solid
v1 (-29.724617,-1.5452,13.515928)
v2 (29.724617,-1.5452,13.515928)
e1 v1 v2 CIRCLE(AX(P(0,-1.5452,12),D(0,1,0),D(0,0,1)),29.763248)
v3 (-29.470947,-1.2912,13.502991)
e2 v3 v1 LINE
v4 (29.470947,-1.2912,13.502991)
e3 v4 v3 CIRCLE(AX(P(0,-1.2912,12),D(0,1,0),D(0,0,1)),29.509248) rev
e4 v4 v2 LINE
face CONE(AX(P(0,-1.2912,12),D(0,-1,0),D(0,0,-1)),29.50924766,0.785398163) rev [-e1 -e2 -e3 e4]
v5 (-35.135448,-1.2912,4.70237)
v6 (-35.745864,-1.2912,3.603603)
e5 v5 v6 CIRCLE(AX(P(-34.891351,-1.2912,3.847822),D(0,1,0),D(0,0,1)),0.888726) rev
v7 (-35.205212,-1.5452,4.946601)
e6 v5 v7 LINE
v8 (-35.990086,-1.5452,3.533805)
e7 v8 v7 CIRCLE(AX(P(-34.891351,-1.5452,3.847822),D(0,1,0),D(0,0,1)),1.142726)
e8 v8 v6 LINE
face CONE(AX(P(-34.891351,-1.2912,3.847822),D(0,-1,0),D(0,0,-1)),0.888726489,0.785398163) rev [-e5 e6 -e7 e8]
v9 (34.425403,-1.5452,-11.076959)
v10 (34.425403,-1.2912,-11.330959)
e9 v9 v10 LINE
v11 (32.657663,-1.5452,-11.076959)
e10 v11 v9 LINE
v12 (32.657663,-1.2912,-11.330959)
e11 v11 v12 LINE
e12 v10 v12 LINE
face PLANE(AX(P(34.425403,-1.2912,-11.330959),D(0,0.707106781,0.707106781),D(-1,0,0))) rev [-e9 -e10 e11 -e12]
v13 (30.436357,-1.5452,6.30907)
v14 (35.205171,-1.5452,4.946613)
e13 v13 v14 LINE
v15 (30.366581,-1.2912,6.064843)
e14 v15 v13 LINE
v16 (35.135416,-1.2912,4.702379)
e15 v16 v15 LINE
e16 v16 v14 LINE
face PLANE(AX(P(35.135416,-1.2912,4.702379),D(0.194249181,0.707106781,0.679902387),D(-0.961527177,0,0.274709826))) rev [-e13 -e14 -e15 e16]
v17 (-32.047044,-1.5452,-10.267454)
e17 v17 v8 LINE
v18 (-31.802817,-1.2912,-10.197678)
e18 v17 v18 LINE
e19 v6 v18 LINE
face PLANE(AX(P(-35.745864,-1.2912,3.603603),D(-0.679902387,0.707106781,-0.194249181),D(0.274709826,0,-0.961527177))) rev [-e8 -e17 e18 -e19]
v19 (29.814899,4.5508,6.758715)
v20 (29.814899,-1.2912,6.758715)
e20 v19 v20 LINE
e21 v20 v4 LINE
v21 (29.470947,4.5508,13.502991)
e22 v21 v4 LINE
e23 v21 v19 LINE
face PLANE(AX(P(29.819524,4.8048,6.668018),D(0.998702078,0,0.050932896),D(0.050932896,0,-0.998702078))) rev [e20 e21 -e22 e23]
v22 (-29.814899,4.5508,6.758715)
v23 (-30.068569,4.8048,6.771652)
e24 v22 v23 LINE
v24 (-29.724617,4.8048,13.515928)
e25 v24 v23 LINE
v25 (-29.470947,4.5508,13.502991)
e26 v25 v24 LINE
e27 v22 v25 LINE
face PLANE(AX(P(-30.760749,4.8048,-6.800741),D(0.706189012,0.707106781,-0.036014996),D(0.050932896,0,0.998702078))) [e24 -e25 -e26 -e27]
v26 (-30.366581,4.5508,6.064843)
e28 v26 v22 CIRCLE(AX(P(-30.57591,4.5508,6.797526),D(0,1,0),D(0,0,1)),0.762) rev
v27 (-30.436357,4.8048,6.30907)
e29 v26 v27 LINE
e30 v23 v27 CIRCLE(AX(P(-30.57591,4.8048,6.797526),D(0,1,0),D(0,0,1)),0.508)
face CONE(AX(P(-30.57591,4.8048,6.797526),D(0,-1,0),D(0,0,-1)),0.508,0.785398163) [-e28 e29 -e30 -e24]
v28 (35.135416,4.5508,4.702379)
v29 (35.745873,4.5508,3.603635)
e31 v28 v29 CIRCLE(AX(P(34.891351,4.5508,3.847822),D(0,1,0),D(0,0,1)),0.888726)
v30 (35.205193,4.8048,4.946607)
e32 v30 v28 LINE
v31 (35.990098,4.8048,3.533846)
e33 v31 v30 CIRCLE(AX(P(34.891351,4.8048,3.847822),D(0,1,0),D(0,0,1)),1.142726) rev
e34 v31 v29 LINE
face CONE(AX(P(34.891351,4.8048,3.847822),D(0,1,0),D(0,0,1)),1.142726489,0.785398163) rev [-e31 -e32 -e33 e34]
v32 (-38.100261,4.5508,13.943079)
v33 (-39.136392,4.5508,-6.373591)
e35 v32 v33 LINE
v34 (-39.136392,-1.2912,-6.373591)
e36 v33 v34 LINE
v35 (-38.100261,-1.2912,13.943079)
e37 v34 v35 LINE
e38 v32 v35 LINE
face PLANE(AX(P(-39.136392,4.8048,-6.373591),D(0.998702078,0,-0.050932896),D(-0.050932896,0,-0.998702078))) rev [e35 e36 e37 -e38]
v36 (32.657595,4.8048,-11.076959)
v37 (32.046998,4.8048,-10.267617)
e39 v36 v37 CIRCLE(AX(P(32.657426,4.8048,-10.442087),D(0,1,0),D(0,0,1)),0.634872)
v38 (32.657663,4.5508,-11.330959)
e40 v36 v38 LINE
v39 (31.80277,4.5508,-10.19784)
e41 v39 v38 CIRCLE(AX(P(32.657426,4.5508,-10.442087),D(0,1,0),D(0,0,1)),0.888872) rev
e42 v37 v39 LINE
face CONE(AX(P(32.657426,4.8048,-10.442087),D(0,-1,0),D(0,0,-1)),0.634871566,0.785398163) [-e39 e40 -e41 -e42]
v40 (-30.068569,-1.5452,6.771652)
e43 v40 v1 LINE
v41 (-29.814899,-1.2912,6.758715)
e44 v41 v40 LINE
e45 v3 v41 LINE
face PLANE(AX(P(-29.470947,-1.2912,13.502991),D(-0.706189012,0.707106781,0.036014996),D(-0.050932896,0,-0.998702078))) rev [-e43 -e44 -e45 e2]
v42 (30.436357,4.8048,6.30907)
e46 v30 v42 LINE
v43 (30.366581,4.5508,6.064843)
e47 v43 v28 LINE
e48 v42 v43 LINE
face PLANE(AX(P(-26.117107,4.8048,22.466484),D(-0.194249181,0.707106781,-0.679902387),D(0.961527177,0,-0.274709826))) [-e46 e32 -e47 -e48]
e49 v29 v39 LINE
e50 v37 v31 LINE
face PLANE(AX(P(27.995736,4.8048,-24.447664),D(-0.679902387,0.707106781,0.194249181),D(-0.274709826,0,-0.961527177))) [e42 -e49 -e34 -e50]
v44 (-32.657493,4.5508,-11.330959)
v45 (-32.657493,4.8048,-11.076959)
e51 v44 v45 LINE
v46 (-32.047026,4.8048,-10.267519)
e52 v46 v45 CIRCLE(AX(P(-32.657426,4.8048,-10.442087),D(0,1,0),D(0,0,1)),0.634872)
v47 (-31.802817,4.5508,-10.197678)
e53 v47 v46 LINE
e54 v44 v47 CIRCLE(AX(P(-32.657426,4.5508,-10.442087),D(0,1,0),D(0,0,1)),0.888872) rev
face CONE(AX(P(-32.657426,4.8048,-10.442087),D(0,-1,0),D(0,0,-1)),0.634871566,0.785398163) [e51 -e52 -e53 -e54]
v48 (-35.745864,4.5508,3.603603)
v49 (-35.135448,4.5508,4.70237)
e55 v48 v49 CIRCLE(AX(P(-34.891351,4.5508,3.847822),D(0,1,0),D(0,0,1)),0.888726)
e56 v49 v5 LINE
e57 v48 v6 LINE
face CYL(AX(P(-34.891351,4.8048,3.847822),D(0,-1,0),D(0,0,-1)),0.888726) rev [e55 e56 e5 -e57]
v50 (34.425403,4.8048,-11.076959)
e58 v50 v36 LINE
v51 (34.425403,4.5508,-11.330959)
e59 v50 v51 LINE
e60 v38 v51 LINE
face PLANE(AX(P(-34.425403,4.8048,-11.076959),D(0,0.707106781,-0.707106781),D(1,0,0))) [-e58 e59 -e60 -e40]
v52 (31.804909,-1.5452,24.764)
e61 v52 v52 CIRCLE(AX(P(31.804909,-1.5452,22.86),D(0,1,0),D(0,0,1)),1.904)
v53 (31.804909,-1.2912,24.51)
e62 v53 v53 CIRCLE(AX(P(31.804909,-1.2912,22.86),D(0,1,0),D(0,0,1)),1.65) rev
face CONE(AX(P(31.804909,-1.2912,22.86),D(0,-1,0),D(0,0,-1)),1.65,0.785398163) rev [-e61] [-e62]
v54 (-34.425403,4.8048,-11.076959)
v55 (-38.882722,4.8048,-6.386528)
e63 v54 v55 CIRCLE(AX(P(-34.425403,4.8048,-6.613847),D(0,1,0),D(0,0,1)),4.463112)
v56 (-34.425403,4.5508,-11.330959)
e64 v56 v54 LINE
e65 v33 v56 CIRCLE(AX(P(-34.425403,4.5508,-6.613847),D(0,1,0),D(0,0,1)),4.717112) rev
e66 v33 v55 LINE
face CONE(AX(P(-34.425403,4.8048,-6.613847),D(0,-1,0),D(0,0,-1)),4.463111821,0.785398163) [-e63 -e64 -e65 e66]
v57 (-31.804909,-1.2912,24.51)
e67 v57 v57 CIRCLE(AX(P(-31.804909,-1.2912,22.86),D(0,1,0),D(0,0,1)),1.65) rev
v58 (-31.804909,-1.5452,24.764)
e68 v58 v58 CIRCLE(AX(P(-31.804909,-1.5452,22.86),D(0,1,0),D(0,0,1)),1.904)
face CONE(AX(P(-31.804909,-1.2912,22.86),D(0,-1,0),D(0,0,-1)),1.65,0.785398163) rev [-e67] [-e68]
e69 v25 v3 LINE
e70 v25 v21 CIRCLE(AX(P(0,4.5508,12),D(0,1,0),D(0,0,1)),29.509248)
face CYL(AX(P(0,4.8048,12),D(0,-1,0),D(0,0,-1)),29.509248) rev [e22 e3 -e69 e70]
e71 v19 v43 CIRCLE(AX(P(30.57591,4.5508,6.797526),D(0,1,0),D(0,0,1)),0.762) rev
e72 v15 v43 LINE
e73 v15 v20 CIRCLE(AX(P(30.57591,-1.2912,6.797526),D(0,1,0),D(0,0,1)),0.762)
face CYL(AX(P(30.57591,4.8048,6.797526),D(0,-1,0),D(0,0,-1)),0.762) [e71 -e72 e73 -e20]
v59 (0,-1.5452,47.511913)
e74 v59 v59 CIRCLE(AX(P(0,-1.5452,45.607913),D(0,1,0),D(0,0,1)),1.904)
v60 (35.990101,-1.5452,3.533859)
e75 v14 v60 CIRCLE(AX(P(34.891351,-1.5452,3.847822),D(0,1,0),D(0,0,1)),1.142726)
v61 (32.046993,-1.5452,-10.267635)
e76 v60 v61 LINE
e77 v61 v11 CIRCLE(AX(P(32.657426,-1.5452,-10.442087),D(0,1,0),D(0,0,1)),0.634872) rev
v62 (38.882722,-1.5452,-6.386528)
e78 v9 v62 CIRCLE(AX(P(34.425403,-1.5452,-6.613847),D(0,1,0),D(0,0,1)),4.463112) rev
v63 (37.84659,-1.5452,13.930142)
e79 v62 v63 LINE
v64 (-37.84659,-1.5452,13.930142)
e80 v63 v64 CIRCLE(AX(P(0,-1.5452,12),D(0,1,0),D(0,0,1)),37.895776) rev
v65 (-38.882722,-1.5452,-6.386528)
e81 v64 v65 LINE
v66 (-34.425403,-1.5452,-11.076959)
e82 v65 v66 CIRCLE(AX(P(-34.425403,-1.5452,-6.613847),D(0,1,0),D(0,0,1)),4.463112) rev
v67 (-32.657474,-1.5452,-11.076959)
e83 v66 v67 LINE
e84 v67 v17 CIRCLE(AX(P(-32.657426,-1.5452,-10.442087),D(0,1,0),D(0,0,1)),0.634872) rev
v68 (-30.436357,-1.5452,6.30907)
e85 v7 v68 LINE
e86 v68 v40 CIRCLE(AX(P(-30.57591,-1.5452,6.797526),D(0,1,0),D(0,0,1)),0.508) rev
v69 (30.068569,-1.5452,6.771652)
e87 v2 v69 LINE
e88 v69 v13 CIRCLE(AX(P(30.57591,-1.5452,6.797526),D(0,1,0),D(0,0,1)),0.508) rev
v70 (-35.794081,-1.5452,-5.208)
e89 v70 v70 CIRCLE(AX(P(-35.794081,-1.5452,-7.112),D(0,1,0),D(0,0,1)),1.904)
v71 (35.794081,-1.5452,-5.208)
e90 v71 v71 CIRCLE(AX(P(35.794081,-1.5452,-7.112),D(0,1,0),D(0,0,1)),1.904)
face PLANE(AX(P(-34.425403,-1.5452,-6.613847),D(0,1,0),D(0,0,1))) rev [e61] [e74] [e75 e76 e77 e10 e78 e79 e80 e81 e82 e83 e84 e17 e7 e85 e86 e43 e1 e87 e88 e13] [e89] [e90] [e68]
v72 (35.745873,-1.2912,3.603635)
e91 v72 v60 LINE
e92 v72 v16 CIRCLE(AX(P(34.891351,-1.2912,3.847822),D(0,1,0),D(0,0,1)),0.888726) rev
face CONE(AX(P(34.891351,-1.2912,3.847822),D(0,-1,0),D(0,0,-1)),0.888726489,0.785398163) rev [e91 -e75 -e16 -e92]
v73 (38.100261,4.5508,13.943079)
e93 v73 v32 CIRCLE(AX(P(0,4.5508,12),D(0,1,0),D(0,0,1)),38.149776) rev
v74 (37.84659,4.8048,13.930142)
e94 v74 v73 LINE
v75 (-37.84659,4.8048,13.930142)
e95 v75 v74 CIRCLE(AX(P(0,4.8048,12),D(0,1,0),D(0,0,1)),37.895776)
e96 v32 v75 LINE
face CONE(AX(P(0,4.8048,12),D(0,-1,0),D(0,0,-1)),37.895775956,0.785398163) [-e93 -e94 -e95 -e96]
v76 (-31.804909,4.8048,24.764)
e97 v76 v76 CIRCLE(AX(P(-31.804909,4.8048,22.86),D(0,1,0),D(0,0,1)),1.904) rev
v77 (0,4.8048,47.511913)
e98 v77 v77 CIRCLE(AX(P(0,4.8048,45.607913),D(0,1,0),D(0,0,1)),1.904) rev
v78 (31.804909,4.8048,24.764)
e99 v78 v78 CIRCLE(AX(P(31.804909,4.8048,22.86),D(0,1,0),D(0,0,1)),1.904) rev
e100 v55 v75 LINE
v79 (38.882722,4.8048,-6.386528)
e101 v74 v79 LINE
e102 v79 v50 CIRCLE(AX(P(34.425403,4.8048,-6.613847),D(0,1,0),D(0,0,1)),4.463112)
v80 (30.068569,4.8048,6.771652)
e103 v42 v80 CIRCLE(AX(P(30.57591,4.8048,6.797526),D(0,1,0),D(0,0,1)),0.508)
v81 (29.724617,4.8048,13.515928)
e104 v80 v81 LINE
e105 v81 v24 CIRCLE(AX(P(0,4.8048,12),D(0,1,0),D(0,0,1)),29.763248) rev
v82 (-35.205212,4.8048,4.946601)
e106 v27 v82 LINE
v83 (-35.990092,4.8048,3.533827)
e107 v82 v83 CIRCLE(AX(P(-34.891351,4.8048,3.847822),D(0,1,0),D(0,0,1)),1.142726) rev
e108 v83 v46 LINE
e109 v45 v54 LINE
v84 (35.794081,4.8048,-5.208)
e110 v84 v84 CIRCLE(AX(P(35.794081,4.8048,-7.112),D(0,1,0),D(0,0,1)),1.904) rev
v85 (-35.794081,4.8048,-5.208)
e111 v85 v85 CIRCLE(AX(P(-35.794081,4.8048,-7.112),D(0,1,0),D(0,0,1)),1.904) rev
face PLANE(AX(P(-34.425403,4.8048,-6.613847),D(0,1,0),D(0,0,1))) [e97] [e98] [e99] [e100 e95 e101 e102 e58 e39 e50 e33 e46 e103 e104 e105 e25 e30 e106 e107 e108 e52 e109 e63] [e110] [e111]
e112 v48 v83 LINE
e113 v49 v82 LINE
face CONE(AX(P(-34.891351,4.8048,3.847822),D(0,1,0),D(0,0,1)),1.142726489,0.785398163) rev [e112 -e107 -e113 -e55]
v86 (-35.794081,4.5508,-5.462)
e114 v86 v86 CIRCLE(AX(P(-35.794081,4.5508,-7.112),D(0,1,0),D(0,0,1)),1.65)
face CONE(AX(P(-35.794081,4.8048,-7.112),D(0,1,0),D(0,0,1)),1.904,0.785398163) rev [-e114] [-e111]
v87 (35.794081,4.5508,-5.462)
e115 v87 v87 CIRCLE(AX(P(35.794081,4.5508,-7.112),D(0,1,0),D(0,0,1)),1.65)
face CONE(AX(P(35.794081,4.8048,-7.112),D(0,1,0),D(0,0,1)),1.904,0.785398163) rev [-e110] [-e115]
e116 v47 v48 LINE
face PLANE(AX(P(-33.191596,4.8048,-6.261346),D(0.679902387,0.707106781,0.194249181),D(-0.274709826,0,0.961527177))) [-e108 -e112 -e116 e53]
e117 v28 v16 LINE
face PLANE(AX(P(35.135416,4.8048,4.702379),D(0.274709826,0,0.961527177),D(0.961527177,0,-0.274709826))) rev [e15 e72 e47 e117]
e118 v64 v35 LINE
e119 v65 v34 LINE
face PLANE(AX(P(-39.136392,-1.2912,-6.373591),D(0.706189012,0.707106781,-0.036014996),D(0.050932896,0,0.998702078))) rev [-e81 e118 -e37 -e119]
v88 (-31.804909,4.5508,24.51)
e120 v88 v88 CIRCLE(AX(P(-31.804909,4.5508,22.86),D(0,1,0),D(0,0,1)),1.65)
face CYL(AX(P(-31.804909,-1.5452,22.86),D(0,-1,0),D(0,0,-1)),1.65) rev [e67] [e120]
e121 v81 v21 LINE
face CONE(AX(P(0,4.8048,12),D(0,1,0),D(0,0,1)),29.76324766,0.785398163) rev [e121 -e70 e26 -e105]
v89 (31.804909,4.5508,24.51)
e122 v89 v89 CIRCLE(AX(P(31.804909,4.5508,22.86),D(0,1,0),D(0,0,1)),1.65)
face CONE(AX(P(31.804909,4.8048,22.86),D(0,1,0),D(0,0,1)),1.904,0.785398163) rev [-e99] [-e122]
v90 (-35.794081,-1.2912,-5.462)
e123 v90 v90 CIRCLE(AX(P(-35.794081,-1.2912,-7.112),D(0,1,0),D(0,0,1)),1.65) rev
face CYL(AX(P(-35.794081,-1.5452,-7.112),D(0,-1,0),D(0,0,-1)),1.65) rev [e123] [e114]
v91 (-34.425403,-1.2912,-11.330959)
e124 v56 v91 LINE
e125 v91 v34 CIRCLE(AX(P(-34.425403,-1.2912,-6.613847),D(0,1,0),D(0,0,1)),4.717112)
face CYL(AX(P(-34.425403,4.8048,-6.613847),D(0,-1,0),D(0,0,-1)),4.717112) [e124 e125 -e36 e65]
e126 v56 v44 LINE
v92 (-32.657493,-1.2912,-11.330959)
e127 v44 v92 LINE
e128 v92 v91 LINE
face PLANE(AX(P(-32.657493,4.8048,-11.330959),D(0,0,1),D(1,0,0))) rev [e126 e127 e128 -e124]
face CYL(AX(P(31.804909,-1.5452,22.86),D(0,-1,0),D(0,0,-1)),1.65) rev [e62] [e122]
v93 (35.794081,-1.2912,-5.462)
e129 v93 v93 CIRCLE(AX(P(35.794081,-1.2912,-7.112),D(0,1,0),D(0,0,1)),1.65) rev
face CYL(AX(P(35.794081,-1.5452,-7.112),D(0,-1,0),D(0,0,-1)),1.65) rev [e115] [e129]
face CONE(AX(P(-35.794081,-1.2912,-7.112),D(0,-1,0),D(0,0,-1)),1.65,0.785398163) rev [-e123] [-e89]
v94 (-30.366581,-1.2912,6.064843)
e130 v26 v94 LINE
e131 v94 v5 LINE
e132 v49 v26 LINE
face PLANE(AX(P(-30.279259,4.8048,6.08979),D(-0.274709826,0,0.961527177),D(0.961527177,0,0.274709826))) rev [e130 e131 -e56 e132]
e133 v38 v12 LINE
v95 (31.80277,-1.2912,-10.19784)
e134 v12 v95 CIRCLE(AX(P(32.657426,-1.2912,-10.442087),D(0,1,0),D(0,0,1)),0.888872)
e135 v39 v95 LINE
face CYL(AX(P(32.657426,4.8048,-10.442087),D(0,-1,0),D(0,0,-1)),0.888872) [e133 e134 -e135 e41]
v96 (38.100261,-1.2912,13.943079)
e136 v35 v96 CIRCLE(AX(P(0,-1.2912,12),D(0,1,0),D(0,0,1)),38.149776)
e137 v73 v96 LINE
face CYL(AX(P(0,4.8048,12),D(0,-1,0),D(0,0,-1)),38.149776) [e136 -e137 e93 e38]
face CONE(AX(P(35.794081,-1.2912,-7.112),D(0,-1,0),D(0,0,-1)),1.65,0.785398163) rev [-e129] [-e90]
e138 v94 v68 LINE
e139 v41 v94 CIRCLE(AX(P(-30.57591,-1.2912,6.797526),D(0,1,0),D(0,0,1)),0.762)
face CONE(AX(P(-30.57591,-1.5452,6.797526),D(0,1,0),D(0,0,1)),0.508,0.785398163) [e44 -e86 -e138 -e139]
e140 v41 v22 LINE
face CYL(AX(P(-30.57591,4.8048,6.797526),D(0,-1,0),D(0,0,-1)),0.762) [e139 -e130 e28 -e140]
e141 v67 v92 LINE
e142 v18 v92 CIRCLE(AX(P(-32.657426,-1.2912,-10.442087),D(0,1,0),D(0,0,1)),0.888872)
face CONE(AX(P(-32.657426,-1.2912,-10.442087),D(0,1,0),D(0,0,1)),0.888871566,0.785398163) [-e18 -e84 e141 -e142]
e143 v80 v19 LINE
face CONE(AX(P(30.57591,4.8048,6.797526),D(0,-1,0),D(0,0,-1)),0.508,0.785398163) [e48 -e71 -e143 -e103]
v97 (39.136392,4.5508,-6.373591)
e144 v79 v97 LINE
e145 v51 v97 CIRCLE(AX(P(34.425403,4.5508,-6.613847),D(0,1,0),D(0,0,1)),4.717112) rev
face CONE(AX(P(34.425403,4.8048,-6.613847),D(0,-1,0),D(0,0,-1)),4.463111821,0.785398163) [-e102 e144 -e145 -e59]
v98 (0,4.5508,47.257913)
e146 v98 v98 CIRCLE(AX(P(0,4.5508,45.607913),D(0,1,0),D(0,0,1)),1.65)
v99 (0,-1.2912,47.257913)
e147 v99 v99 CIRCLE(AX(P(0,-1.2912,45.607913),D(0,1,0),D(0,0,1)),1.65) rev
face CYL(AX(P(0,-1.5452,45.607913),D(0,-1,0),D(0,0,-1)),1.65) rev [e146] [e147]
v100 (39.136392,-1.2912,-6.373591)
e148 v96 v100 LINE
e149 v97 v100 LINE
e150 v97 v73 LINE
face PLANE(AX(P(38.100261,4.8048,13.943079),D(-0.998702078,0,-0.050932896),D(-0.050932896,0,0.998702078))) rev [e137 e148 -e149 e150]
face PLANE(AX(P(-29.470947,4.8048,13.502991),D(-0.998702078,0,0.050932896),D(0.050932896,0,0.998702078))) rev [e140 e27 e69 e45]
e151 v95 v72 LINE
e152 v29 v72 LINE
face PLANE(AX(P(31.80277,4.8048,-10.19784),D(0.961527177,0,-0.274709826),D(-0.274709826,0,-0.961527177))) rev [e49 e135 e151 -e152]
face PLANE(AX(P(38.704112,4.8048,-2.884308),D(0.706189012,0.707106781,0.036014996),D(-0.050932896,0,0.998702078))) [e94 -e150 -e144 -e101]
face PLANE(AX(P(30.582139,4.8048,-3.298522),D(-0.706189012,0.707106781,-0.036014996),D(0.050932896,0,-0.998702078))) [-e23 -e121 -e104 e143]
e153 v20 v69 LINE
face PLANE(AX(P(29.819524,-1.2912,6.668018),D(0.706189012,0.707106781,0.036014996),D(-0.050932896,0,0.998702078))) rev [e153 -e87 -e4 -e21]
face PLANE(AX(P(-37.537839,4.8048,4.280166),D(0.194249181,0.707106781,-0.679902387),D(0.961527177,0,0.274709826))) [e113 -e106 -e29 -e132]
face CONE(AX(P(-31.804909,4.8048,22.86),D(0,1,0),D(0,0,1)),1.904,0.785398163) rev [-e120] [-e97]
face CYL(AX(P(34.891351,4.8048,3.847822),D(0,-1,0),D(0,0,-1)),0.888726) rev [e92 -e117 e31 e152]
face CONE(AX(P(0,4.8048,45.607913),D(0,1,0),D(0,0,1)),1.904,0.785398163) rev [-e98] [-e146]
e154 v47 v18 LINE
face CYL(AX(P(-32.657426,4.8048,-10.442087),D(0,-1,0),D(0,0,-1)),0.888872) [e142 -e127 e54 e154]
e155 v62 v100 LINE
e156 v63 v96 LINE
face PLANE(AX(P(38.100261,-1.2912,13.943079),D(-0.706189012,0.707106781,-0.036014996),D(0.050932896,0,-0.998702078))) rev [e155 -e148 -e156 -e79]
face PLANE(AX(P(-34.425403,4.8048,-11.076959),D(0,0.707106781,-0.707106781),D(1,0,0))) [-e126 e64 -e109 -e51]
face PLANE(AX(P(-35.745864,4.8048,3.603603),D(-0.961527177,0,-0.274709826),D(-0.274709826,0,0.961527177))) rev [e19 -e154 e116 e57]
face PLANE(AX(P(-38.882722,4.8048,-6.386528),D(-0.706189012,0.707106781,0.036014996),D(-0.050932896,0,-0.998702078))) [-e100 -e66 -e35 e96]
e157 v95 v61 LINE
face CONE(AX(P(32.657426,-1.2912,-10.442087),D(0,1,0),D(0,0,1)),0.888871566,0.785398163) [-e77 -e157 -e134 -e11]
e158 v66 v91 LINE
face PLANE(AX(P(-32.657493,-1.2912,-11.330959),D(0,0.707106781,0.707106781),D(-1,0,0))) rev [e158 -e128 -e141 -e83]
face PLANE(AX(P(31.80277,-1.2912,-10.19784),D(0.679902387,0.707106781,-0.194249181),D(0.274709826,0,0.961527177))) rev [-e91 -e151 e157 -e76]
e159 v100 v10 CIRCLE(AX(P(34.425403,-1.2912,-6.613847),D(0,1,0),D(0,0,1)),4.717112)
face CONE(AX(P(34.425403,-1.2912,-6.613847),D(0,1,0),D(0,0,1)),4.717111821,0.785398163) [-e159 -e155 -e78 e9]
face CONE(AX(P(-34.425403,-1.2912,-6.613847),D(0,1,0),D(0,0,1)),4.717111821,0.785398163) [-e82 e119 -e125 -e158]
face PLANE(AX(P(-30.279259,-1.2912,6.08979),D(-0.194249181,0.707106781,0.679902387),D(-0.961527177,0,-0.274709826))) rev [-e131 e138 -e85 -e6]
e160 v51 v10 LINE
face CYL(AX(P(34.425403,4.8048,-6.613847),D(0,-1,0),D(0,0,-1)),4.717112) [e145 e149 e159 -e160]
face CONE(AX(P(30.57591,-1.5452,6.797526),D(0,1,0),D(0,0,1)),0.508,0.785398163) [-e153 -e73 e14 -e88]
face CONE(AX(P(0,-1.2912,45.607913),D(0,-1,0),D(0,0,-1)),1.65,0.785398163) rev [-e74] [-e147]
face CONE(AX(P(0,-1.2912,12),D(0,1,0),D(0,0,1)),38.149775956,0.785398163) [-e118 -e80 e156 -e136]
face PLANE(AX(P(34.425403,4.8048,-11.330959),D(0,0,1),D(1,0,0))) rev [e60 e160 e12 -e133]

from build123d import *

# Parameters (mm, degrees)
BOSS_EXTRUDE1_DEPTH   = 6.35
M4X0_7_TAPPED_HOLE1_D = 3.3
MOVE_START            = -1.5452
MOVE_FACE1_DEPTH      = 6.35
FILLET1_R             = 0.762
CHAMFER1_SIZE         = 0.254


# Read off the part's stored shape, not the designer's step: Move Face1
with BuildPart() as part:
    # Sketch1 → Boss-Extrude1 (new body)
    with BuildSketch(Plane(origin=(0, -1.5452, 0), x_dir=(1, 0, 0), z_dir=(0, 1, 0))):
        with BuildLine():
            Line((-38.502216327, 6.405933187), (-37.466084693, -13.910736196))
            ThreePointArc((-37.466084693, -13.910736196), (0, -49.514775956), (37.466084693, -13.910736196))
            Line((37.466084693, -13.910736196), (38.502216327, 6.405933187))
            ThreePointArc((38.502216327, 6.405933187), (37.384487444, 9.425866669), (34.42540277, 10.695958786))
            Line((34.42540277, 10.695958786), (32.657493289, 10.695958786))
            ThreePointArc((32.657493289, 10.695958786), (32.454748459, 10.594968738), (32.41333978, 10.372281116))
            Line((32.41333978, 10.372281116), (36.356433895, -3.429162442))
            ThreePointArc((36.356433895, -3.429162442), (36.223319367, -4.587824739), (35.309857101, -5.312948512))
            Line((35.309857101, -5.312948512), (30.453700202, -6.70036017))
            Line((30.453700202, -6.70036017), (30.10512277, -13.535333842))
            ThreePointArc((30.10512277, -13.535333842), (0, -42.14424766), (-30.10512277, -13.535333842))
            Line((-30.10512277, -13.535333842), (-30.453700202, -6.70036017))
            Line((-30.453700202, -6.70036017), (-35.309857101, -5.312948512))
            ThreePointArc((-35.309857101, -5.312948512), (-36.223319367, -4.587824739), (-36.356433895, -3.429162442))
            Line((-36.356433895, -3.429162442), (-32.41333978, 10.372281116))
            ThreePointArc((-32.41333978, 10.372281116), (-32.454748459, 10.594968738), (-32.657493289, 10.695958786))
            Line((-32.657493289, 10.695958786), (-34.42540277, 10.695958786))
            ThreePointArc((-34.42540277, 10.695958786), (-37.384487444, 9.425866669), (-38.502216327, 6.405933187))
        make_face()
    extrude(amount=BOSS_EXTRUDE1_DEPTH)

    # M4x0.7 Tapped Hole1 (through all)
    with Locations(Plane(origin=(0, -1.5452, 0), x_dir=(-1, 0, 0), z_dir=(0, -1, 0))):
        with Locations((31.804908667, -22.86), (35.794080898, 7.112), (0, -45.607912987), (-31.804908667, -22.86), (-35.794080898, 7.112)):
            Hole(M4X0_7_TAPPED_HOLE1_D / 2)

    # Move Face1 outline → Move Face1 (add)
    with BuildSketch(Plane(origin=(0, 0, 0), x_dir=(1, 0, 0), z_dir=(0, 1, 0)).offset(MOVE_START)):
        with BuildLine():
            ThreePointArc((-34.42540277, 11.330958786), (-37.844793004, 9.863295282), (-39.136392147, 6.373590798))
            Line((-39.136392147, 6.373590798), (-38.100260512, -13.943078585))
            ThreePointArc((-38.100260512, -13.943078585), (0, -50.149775956), (38.100260512, -13.943078585))
            Line((38.100260512, -13.943078585), (39.136392147, 6.373590798))
            ThreePointArc((39.136392147, 6.373590798), (37.844793004, 9.863295282), (34.42540277, 11.330958786))
            Line((34.42540277, 11.330958786), (32.657662642, 11.330958764))
            ThreePointArc((32.657662642, 11.330958764), (31.94785031, 10.977433467), (31.802770017, 10.197840375))
            Line((31.802770017, 10.197840375), (35.745873307, -3.603635272))
            ThreePointArc((35.745873307, -3.603635272), (35.668225017, -4.27944954), (35.135416361, -4.702378753))
            Line((35.135416361, -4.702378753), (29.842651852, -6.214529893))
            Line((29.842651852, -6.214529893), (29.47094695, -13.502991453))
            ThreePointArc((29.47094695, -13.502991453), (0, -41.50924766), (-29.47094695, -13.502991453))
            Line((-29.47094695, -13.502991453), (-29.842651852, -6.214529893))
            Line((-29.842651852, -6.214529893), (-35.135448453, -4.702369587))
            ThreePointArc((-35.135448453, -4.702369587), (-35.668241226, -4.279420366), (-35.745864137, -3.603603182))
            Line((-35.745864137, -3.603603182), (-31.802816567, 10.197677545))
            ThreePointArc((-31.802816567, 10.197677545), (-31.947748326, 10.977298265), (-32.657493289, 11.330958793))
            Line((-32.657493289, 11.330958793), (-34.42540277, 11.330958786))
        make_face()
        with BuildLine():
            Line((-37.466084693, -13.910736196), (-38.502216327, 6.405933187))
            ThreePointArc((-38.502216327, 6.405933187), (-37.384487444, 9.425866669), (-34.42540277, 10.695958786))
            Line((-34.42540277, 10.695958786), (-32.657493289, 10.695958786))
            ThreePointArc((-32.657493289, 10.695958786), (-32.454748459, 10.594968738), (-32.41333978, 10.372281116))
            Line((-32.41333978, 10.372281116), (-36.356433895, -3.429162442))
            ThreePointArc((-36.356433895, -3.429162442), (-36.223319367, -4.587824739), (-35.309857101, -5.312948512))
            Line((-35.309857101, -5.312948512), (-30.453700202, -6.70036017))
            Line((-30.453700202, -6.70036017), (-30.10512277, -13.535333842))
            ThreePointArc((-30.10512277, -13.535333842), (0, -42.14424766), (30.10512277, -13.535333842))
            Line((30.10512277, -13.535333842), (30.453700202, -6.70036017))
            Line((30.453700202, -6.70036017), (35.309857101, -5.312948512))
            ThreePointArc((35.309857101, -5.312948512), (36.223319367, -4.587824739), (36.356433895, -3.429162442))
            Line((36.356433895, -3.429162442), (32.41333978, 10.372281116))
            ThreePointArc((32.41333978, 10.372281116), (32.454748459, 10.594968738), (32.657493289, 10.695958786))
            Line((32.657493289, 10.695958786), (34.42540277, 10.695958786))
            ThreePointArc((34.42540277, 10.695958786), (37.384487444, 9.425866669), (38.502216327, 6.405933187))
            Line((38.502216327, 6.405933187), (37.466084693, -13.910736196))
            ThreePointArc((37.466084693, -13.910736196), (0, -49.514775956), (-37.466084693, -13.910736196))
        make_face(mode=Mode.SUBTRACT)
    extrude(amount=MOVE_FACE1_DEPTH)

    # Fillet1
    fillet1_edges = [part.edges().sort_by_distance(p)[0] for p in [
        (-29.842651852, 1.6298, 6.214529893),
        (29.842651852, 1.6298, 6.214529893),
    ]]
    fillet(fillet1_edges, radius=FILLET1_R)

    # Chamfer1
    chamfer1_edges = [part.edges().sort_by_distance(p)[0] for p in [
        (0, 4.8048, 50.149775956),
        (38.61832633, 4.8048, 3.784743893),
        (-33.54144803, -1.5452, -11.33095879),
        (37.844793004, 4.8048, -9.863295282),
        (-31.947748326, -1.5452, -10.977298265),
        (-33.774340352, -1.5452, -3.297037181),
        (-35.668241226, -1.5452, 4.279420366),
        (-29.642922919, -1.5452, 10.130853406),
        (0, -1.5452, 41.50924766),
        (32.750998673, -1.5452, 5.383610635),
        (33.541532706, 4.8048, -11.330958775),
        (35.668225017, -1.5452, 4.27944954),
        (33.774321662, -1.5452, -3.297102552),
        (31.94785031, -1.5452, -10.977433467),
        (33.541532706, -1.5452, -11.330958775),
        (37.844793004, -1.5452, -9.863295282),
        (38.61832633, -1.5452, 3.784743893),
        (0, -1.5452, 50.149775956),
        (31.94785031, 4.8048, -10.977433467),
        (-38.61832633, -1.5452, 3.784743893),
        (-37.844793004, -1.5452, -9.863295282),
        (33.774321662, 4.8048, -3.297102552),
        (35.668225017, 4.8048, 4.27944954),
        (32.750998673, 4.8048, 5.383610635),
        (0, 4.8048, 41.50924766),
        (-37.844793004, 4.8048, -9.863295282),
        (-29.642922919, 4.8048, 10.130853406),
        (-35.668241226, 4.8048, 4.279420366),
        (-33.774340352, 4.8048, -3.297037181),
        (-31.947748326, 4.8048, -10.977298265),
        (34.144080898, -1.5452, -7.112),
        (34.144080898, 4.8048, -7.112),
        (-33.54144803, 4.8048, -11.33095879),
        (30.154908667, -1.5452, 22.86),
        (30.154908667, 4.8048, 22.86),
        (-1.65, -1.5452, 45.607912987),
        (-1.65, 4.8048, 45.607912987),
        (-37.444080898, -1.5452, -7.112),
        (-37.444080898, 4.8048, -7.112),
        (-38.61832633, 4.8048, 3.784743893),
        (-33.454908667, -1.5452, 22.86),
        (-33.454908667, 4.8048, 22.86),
        (-32.751014719, -1.5452, 5.383606052),
        (-32.751014719, 4.8048, 5.383606052),
        (29.642922919, -1.5452, 10.130853405),
        (29.979458075, -1.5452, 6.323301327),
        (-29.979458075, -1.5452, 6.323301327),
        (29.642922919, 4.8048, 10.130853405),
        (29.979458075, 4.8048, 6.323301327),
        (-29.979458075, 4.8048, 6.323301327),
    ]]
    chamfer(chamfer1_edges, length=CHAMFER1_SIZE)


solid = part.part
